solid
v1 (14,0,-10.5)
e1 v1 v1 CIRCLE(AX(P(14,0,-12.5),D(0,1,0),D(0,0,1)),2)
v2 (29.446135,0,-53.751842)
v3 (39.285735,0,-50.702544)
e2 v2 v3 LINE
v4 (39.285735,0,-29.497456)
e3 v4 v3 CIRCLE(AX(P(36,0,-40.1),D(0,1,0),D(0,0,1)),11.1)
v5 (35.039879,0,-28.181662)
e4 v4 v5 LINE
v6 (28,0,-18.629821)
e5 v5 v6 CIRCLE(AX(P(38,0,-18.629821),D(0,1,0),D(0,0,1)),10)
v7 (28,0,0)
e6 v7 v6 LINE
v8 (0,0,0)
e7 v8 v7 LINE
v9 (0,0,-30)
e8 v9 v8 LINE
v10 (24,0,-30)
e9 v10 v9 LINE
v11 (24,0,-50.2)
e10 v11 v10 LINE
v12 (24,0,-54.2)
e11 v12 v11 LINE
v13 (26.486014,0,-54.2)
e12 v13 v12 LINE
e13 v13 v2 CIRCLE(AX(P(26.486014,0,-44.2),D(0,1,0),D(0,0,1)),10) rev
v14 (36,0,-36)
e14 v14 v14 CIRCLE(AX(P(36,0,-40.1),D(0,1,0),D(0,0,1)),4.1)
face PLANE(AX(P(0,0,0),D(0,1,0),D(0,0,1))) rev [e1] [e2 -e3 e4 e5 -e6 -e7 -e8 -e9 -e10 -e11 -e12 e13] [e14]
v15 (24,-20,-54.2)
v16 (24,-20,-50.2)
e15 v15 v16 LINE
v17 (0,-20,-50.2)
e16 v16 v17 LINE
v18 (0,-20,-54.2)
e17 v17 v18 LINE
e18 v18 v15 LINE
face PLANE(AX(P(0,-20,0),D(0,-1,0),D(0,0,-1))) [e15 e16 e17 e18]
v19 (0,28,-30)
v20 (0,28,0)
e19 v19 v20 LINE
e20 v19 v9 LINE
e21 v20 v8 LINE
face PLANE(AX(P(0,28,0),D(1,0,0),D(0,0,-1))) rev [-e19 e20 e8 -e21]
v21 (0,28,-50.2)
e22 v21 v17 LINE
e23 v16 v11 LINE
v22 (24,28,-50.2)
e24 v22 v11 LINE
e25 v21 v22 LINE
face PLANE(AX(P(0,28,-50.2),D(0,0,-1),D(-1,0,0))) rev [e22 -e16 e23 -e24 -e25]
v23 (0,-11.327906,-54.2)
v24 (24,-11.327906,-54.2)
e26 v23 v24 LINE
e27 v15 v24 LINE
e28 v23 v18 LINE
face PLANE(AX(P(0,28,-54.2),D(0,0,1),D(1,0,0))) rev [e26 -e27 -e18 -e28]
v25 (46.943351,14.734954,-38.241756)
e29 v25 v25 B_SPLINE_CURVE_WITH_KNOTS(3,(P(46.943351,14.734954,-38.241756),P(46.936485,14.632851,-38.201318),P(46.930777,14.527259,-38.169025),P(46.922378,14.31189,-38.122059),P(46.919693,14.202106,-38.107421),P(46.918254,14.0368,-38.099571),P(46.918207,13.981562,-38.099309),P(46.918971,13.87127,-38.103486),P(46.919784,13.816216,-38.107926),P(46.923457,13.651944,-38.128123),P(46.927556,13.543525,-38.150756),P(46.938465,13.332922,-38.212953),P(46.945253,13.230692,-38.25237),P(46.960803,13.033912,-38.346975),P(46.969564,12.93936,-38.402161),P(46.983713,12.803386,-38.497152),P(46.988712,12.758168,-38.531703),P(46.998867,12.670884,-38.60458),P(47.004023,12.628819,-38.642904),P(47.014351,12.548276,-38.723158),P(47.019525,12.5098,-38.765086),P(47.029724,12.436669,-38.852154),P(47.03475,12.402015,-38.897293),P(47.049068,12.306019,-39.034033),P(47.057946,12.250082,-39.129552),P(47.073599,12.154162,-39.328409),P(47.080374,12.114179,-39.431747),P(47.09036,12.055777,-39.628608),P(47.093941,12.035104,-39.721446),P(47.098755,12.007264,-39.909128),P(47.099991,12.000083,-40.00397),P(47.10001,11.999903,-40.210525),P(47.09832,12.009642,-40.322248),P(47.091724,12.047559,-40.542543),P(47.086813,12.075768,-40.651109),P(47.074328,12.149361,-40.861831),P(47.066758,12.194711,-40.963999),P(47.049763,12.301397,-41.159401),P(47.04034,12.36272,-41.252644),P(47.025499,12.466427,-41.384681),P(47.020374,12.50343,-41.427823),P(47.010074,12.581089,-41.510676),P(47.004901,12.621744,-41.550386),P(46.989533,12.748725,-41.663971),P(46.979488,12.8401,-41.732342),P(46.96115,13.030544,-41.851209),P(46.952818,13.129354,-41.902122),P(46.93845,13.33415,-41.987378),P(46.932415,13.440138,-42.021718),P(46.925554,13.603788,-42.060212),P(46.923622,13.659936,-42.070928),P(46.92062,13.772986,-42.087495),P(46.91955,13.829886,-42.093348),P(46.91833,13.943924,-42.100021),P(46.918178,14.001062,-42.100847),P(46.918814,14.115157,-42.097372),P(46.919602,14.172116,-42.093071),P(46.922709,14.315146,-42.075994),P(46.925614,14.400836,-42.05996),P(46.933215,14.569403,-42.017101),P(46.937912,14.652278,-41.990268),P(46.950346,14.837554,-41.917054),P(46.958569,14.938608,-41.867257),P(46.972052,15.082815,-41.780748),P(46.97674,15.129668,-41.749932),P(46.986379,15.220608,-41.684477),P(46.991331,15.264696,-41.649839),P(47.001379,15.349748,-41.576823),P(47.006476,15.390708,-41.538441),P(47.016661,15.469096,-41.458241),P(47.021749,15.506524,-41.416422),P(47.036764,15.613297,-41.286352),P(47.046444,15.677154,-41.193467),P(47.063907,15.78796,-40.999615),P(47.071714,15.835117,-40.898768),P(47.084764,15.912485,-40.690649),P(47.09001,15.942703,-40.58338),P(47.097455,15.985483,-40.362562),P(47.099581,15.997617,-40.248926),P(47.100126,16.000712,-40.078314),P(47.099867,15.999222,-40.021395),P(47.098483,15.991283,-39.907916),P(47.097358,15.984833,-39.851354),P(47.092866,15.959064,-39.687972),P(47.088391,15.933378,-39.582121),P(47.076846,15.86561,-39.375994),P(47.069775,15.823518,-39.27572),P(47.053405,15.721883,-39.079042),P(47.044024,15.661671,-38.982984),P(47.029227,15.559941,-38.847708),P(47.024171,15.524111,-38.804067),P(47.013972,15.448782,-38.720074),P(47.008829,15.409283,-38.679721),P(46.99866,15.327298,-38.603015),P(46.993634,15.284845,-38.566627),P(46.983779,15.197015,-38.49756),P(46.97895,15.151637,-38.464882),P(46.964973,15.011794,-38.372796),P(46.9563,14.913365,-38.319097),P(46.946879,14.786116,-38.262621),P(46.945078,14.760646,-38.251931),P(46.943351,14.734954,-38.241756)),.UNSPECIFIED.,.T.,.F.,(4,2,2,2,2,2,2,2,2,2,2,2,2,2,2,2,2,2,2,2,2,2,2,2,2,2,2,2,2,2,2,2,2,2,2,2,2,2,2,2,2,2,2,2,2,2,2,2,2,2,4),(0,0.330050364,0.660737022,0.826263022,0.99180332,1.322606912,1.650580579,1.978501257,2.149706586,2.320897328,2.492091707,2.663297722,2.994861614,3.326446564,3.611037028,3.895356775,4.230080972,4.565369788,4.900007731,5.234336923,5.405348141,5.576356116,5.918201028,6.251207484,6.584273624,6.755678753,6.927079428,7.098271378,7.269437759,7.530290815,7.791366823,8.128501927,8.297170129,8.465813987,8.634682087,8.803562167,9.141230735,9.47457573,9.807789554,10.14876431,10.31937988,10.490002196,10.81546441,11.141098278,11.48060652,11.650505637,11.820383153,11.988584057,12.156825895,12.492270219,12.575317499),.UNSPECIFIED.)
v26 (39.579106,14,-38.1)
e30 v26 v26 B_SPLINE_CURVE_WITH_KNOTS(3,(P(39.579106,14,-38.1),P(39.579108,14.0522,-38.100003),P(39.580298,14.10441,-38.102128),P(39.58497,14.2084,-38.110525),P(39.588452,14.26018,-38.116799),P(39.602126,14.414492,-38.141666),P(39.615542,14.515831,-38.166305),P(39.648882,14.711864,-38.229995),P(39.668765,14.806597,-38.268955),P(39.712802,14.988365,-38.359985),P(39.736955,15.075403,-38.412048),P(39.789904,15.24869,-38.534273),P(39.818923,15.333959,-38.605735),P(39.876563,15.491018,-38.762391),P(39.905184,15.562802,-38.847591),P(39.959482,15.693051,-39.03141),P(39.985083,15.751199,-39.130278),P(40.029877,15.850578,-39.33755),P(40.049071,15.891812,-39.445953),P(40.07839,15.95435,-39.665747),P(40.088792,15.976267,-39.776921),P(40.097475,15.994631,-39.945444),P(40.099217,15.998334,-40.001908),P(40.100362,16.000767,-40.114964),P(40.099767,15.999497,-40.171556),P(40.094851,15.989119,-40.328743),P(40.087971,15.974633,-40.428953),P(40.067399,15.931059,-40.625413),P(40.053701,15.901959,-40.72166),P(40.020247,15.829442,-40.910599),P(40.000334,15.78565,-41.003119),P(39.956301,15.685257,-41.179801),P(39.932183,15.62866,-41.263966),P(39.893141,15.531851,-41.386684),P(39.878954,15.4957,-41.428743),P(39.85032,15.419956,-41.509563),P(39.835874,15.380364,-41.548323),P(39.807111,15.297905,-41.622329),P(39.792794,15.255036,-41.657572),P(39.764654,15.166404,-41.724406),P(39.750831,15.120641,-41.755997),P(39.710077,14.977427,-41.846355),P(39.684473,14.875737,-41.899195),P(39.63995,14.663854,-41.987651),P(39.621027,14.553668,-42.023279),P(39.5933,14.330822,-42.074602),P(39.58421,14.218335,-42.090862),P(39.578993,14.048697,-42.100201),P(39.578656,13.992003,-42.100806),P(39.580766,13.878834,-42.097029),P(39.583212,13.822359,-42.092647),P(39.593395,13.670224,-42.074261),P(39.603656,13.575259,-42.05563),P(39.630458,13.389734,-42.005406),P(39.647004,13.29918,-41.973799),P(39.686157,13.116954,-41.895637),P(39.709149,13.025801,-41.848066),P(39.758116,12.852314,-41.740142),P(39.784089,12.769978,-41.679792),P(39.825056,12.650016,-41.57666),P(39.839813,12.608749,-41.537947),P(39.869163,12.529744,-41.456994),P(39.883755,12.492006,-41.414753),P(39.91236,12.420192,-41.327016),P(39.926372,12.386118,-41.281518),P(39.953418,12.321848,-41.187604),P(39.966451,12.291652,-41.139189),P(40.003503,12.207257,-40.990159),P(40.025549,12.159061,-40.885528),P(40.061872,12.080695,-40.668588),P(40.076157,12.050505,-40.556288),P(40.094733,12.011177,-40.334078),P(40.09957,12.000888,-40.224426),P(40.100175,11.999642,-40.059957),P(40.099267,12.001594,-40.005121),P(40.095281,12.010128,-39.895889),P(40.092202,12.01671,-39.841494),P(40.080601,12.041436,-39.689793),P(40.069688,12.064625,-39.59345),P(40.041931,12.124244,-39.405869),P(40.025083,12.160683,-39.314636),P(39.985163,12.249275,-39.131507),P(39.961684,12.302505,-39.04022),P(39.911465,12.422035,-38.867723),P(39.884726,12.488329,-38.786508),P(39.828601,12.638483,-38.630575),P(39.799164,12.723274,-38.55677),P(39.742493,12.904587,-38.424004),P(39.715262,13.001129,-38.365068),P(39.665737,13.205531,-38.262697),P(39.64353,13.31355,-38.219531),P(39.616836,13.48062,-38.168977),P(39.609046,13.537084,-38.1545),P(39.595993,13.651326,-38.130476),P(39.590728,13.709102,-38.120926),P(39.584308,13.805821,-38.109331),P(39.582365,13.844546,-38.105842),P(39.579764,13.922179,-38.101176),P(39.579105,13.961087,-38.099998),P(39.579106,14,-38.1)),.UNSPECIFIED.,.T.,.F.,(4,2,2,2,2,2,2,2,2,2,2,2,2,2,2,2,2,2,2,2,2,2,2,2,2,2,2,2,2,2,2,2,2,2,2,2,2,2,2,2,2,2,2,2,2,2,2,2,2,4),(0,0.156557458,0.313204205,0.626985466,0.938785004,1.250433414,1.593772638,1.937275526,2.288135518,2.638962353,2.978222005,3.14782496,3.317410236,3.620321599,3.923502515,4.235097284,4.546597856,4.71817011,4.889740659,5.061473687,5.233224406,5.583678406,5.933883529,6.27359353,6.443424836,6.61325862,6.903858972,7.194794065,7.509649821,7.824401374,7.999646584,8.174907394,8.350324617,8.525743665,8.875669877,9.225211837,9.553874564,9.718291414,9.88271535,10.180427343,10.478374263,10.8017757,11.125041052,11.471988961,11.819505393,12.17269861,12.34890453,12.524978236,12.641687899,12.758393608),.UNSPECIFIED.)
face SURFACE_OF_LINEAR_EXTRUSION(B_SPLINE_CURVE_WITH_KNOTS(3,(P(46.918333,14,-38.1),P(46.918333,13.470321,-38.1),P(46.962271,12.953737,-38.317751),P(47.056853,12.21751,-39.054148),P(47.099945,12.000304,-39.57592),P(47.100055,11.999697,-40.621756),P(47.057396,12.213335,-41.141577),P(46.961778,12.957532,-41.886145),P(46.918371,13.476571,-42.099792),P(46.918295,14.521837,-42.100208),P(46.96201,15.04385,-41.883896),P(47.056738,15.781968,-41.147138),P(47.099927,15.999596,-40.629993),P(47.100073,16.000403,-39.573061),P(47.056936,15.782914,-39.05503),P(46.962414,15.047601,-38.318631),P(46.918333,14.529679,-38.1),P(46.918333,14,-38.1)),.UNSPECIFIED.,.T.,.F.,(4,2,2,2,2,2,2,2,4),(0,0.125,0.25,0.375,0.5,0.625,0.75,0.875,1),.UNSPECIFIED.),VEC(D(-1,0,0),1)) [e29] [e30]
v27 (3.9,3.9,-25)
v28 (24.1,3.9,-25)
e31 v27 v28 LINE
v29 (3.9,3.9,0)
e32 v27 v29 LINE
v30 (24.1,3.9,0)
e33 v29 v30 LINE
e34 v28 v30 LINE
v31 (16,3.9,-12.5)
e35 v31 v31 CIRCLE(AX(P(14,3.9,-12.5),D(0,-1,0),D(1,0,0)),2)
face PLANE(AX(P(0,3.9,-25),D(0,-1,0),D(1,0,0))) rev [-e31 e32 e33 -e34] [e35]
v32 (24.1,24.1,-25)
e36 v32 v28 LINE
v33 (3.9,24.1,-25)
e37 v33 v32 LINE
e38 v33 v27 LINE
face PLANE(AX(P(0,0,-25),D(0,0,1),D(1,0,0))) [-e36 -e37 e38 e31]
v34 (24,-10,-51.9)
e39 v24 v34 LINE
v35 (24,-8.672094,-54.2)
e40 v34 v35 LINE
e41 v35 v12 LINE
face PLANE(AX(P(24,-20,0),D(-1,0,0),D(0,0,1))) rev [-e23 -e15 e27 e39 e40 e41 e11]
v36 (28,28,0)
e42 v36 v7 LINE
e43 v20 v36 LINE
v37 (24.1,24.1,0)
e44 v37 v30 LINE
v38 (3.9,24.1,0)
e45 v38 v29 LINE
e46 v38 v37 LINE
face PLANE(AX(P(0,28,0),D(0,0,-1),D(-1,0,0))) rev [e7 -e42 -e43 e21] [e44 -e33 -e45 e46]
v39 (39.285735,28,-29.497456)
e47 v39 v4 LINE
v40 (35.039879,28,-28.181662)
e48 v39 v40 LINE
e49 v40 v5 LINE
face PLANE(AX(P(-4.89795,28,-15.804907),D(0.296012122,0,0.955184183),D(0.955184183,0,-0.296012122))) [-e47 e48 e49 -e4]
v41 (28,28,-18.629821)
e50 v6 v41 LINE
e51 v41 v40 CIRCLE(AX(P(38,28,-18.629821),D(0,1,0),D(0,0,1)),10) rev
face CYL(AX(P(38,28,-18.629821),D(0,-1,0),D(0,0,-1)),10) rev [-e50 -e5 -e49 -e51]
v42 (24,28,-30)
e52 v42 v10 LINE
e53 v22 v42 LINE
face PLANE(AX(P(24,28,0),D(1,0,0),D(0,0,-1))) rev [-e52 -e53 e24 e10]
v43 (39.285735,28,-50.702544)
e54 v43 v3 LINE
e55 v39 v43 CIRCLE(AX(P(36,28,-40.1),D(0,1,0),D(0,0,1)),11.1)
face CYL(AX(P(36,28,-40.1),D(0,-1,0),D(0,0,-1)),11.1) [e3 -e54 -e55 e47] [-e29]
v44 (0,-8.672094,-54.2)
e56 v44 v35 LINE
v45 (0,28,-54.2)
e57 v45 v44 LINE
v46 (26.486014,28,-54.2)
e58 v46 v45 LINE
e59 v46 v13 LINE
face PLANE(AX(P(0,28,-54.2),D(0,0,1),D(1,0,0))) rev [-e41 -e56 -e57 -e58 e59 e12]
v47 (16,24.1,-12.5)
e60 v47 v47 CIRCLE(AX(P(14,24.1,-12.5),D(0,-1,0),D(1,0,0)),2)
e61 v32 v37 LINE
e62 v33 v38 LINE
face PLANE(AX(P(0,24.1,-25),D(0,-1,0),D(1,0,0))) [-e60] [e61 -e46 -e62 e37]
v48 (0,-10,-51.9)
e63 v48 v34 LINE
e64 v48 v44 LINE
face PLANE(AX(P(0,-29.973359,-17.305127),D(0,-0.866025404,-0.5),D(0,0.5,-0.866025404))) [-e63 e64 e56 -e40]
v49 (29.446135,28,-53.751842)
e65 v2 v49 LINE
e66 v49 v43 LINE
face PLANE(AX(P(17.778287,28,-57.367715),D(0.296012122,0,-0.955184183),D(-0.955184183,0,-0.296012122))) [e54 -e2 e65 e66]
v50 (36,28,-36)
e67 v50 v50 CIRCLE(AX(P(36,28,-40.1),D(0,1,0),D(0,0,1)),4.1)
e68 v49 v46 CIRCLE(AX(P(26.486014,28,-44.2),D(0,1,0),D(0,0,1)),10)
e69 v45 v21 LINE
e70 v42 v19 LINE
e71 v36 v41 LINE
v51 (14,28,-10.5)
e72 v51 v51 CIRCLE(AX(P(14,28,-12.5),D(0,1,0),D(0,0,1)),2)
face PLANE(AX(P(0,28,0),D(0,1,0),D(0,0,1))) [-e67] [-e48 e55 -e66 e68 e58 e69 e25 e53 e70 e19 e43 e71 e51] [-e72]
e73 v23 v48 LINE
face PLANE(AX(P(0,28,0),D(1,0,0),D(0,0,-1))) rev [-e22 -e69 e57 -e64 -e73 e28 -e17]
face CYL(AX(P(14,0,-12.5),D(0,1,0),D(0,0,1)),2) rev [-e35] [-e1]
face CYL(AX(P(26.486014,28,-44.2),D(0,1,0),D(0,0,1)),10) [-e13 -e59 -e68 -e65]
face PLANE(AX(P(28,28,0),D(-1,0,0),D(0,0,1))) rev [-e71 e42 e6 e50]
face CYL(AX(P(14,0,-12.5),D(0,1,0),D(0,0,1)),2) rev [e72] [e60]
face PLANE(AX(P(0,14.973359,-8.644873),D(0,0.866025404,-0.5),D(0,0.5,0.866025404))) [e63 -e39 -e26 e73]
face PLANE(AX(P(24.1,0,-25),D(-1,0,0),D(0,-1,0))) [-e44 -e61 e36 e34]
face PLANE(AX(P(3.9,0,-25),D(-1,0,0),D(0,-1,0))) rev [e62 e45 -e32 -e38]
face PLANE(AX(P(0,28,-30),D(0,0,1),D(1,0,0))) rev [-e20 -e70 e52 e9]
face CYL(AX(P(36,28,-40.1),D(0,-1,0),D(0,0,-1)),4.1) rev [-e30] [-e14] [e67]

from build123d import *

# Parameters (mm, degrees)
SKETCH1_R           = 4.1
BOSS_EXTRUDE1_DEPTH = 28
SKETCH2_W           = 20.2
SKETCH2_H           = 20.2
CUT_EXTRUDE1_DEPTH  = 25
SKETCH3_R           = 2
CUT_EXTRUDE2_DEPTH  = 78.071719846
FILLET1_R           = 10
SKETCH4_W           = 24
SKETCH4_H           = 4
BOSS_EXTRUDE2_DEPTH = 20
CUT_EXTRUDE3_DEPTH  = 66.556387942
CUT_EXTRUDE4_START  = 15.579105931
CUT_EXTRUDE4_DEPTH  = 7.520894069


# Read off the part's stored shape, not the designer's step: Cut-Extrude4
with BuildPart() as part:
    # Sketch1 → Boss-Extrude1 (new body)
    # profile 1 of 2: a face of its own
    with BuildSketch(Plane(origin=(0, 0, 0), x_dir=(1, 0, 0), z_dir=(0, 1, 0))):
        with BuildLine():
            Line((39.285734559, 50.702544431), (28, 54.2))
            Line((28, 54.2), (28, 26))
            Line((28, 26), (39.285734559, 29.497455569))
            ThreePointArc((39.285734559, 29.497455569), (47.1, 40.1), (39.285734559, 50.702544431))
        make_face()
        with Locations(Location((36, 40.1, 0), (0, 0, 270))):
            Circle(SKETCH1_R, mode=Mode.SUBTRACT)
    # profile 2 of 2: a face of its own
    with BuildSketch(Plane(origin=(0, 0, 0), x_dir=(1, 0, 0), z_dir=(0, 1, 0))):
        Polygon((28, 0), (28, 54.2), (0, 54.2), (0, 50.2), (24, 50.2), (24, 30), (0, 30), (0, 0), align=None)
    extrude(amount=BOSS_EXTRUDE1_DEPTH)

    # Sketch2 → Cut-Extrude1 (cut)
    with BuildSketch(Plane.XY):
        with Locations((14, 14)):
            Rectangle(SKETCH2_W, SKETCH2_H)
    extrude(amount=-CUT_EXTRUDE1_DEPTH, mode=Mode.SUBTRACT)

    # Sketch3 → Cut-Extrude2 (cut, through all)
    with BuildSketch(Plane(origin=(0, 28, 0), x_dir=(1, 0, 0), z_dir=(0, 1, 0))):
        with Locations(Location((14, 12.5, 0), (0, 0, 270))):
            Circle(SKETCH3_R)
    extrude(amount=-CUT_EXTRUDE2_DEPTH, mode=Mode.SUBTRACT)

    # Fillet1
    fillet1_edges = [part.edges().sort_by_distance(p)[0] for p in [
        (28, 14, -26),
        (28, 14, -54.2),
    ]]
    fillet(fillet1_edges, radius=FILLET1_R)

    # Sketch4 → Boss-Extrude2 (add)
    with BuildSketch(Plane.XZ):
        with Locations((12, -52.2)):
            Rectangle(SKETCH4_W, SKETCH4_H)
    extrude(amount=BOSS_EXTRUDE2_DEPTH)

    # Sketch5 → Cut-Extrude3 (cut, through all)
    with BuildSketch(Plane(origin=(24, 0, 0), x_dir=(0, 0, -1), z_dir=(1, 0, 0))):
        Polygon((54.2, -11.327905619), (54.2, -8.672094381), (53.2, -9.24944465), (53.2, -10.75055535), align=None)
        Polygon((53.2, -10.75055535), (53.2, -9.24944465), (51.9, -10), align=None)
    extrude(amount=-CUT_EXTRUDE3_DEPTH, mode=Mode.SUBTRACT)

    # Cut-Extrude4 outline → Cut-Extrude4 (cut)
    with BuildSketch(Plane(origin=(24, 0, 0), x_dir=(0, 0, -1), z_dir=(1, 0, 0)).offset(CUT_EXTRUDE4_START)):
        with BuildLine():
            add(Edge.make_bspline(
                [(38.1, 14), (38.1, 13.470320913), (38.317750981, 12.95373695), (39.054148284, 12.217509573), (39.57591962, 12.000304151), (40.621756395, 11.999696524), (41.14157679, 12.213335487), (41.886144514, 12.957531743), (42.099791904, 13.47657128), (42.100207779, 14.521837258), (41.883895964, 15.043849972), (41.147138028, 15.78196788), (40.629992878, 15.999596004), (39.573060585, 16.00040283), (39.055030391, 15.78291354), (38.318631187, 15.047600747), (38.1, 14.529679087), (38.1, 14)],
                knots=[0, 0, 0, 0, 0.125, 0.125, 0.25, 0.25, 0.375, 0.375, 0.5, 0.5, 0.625, 0.625, 0.75, 0.75, 0.875, 0.875, 1, 1, 1, 1], degree=3))
        make_face()
    extrude(amount=CUT_EXTRUDE4_DEPTH, mode=Mode.SUBTRACT)


solid = part.part
